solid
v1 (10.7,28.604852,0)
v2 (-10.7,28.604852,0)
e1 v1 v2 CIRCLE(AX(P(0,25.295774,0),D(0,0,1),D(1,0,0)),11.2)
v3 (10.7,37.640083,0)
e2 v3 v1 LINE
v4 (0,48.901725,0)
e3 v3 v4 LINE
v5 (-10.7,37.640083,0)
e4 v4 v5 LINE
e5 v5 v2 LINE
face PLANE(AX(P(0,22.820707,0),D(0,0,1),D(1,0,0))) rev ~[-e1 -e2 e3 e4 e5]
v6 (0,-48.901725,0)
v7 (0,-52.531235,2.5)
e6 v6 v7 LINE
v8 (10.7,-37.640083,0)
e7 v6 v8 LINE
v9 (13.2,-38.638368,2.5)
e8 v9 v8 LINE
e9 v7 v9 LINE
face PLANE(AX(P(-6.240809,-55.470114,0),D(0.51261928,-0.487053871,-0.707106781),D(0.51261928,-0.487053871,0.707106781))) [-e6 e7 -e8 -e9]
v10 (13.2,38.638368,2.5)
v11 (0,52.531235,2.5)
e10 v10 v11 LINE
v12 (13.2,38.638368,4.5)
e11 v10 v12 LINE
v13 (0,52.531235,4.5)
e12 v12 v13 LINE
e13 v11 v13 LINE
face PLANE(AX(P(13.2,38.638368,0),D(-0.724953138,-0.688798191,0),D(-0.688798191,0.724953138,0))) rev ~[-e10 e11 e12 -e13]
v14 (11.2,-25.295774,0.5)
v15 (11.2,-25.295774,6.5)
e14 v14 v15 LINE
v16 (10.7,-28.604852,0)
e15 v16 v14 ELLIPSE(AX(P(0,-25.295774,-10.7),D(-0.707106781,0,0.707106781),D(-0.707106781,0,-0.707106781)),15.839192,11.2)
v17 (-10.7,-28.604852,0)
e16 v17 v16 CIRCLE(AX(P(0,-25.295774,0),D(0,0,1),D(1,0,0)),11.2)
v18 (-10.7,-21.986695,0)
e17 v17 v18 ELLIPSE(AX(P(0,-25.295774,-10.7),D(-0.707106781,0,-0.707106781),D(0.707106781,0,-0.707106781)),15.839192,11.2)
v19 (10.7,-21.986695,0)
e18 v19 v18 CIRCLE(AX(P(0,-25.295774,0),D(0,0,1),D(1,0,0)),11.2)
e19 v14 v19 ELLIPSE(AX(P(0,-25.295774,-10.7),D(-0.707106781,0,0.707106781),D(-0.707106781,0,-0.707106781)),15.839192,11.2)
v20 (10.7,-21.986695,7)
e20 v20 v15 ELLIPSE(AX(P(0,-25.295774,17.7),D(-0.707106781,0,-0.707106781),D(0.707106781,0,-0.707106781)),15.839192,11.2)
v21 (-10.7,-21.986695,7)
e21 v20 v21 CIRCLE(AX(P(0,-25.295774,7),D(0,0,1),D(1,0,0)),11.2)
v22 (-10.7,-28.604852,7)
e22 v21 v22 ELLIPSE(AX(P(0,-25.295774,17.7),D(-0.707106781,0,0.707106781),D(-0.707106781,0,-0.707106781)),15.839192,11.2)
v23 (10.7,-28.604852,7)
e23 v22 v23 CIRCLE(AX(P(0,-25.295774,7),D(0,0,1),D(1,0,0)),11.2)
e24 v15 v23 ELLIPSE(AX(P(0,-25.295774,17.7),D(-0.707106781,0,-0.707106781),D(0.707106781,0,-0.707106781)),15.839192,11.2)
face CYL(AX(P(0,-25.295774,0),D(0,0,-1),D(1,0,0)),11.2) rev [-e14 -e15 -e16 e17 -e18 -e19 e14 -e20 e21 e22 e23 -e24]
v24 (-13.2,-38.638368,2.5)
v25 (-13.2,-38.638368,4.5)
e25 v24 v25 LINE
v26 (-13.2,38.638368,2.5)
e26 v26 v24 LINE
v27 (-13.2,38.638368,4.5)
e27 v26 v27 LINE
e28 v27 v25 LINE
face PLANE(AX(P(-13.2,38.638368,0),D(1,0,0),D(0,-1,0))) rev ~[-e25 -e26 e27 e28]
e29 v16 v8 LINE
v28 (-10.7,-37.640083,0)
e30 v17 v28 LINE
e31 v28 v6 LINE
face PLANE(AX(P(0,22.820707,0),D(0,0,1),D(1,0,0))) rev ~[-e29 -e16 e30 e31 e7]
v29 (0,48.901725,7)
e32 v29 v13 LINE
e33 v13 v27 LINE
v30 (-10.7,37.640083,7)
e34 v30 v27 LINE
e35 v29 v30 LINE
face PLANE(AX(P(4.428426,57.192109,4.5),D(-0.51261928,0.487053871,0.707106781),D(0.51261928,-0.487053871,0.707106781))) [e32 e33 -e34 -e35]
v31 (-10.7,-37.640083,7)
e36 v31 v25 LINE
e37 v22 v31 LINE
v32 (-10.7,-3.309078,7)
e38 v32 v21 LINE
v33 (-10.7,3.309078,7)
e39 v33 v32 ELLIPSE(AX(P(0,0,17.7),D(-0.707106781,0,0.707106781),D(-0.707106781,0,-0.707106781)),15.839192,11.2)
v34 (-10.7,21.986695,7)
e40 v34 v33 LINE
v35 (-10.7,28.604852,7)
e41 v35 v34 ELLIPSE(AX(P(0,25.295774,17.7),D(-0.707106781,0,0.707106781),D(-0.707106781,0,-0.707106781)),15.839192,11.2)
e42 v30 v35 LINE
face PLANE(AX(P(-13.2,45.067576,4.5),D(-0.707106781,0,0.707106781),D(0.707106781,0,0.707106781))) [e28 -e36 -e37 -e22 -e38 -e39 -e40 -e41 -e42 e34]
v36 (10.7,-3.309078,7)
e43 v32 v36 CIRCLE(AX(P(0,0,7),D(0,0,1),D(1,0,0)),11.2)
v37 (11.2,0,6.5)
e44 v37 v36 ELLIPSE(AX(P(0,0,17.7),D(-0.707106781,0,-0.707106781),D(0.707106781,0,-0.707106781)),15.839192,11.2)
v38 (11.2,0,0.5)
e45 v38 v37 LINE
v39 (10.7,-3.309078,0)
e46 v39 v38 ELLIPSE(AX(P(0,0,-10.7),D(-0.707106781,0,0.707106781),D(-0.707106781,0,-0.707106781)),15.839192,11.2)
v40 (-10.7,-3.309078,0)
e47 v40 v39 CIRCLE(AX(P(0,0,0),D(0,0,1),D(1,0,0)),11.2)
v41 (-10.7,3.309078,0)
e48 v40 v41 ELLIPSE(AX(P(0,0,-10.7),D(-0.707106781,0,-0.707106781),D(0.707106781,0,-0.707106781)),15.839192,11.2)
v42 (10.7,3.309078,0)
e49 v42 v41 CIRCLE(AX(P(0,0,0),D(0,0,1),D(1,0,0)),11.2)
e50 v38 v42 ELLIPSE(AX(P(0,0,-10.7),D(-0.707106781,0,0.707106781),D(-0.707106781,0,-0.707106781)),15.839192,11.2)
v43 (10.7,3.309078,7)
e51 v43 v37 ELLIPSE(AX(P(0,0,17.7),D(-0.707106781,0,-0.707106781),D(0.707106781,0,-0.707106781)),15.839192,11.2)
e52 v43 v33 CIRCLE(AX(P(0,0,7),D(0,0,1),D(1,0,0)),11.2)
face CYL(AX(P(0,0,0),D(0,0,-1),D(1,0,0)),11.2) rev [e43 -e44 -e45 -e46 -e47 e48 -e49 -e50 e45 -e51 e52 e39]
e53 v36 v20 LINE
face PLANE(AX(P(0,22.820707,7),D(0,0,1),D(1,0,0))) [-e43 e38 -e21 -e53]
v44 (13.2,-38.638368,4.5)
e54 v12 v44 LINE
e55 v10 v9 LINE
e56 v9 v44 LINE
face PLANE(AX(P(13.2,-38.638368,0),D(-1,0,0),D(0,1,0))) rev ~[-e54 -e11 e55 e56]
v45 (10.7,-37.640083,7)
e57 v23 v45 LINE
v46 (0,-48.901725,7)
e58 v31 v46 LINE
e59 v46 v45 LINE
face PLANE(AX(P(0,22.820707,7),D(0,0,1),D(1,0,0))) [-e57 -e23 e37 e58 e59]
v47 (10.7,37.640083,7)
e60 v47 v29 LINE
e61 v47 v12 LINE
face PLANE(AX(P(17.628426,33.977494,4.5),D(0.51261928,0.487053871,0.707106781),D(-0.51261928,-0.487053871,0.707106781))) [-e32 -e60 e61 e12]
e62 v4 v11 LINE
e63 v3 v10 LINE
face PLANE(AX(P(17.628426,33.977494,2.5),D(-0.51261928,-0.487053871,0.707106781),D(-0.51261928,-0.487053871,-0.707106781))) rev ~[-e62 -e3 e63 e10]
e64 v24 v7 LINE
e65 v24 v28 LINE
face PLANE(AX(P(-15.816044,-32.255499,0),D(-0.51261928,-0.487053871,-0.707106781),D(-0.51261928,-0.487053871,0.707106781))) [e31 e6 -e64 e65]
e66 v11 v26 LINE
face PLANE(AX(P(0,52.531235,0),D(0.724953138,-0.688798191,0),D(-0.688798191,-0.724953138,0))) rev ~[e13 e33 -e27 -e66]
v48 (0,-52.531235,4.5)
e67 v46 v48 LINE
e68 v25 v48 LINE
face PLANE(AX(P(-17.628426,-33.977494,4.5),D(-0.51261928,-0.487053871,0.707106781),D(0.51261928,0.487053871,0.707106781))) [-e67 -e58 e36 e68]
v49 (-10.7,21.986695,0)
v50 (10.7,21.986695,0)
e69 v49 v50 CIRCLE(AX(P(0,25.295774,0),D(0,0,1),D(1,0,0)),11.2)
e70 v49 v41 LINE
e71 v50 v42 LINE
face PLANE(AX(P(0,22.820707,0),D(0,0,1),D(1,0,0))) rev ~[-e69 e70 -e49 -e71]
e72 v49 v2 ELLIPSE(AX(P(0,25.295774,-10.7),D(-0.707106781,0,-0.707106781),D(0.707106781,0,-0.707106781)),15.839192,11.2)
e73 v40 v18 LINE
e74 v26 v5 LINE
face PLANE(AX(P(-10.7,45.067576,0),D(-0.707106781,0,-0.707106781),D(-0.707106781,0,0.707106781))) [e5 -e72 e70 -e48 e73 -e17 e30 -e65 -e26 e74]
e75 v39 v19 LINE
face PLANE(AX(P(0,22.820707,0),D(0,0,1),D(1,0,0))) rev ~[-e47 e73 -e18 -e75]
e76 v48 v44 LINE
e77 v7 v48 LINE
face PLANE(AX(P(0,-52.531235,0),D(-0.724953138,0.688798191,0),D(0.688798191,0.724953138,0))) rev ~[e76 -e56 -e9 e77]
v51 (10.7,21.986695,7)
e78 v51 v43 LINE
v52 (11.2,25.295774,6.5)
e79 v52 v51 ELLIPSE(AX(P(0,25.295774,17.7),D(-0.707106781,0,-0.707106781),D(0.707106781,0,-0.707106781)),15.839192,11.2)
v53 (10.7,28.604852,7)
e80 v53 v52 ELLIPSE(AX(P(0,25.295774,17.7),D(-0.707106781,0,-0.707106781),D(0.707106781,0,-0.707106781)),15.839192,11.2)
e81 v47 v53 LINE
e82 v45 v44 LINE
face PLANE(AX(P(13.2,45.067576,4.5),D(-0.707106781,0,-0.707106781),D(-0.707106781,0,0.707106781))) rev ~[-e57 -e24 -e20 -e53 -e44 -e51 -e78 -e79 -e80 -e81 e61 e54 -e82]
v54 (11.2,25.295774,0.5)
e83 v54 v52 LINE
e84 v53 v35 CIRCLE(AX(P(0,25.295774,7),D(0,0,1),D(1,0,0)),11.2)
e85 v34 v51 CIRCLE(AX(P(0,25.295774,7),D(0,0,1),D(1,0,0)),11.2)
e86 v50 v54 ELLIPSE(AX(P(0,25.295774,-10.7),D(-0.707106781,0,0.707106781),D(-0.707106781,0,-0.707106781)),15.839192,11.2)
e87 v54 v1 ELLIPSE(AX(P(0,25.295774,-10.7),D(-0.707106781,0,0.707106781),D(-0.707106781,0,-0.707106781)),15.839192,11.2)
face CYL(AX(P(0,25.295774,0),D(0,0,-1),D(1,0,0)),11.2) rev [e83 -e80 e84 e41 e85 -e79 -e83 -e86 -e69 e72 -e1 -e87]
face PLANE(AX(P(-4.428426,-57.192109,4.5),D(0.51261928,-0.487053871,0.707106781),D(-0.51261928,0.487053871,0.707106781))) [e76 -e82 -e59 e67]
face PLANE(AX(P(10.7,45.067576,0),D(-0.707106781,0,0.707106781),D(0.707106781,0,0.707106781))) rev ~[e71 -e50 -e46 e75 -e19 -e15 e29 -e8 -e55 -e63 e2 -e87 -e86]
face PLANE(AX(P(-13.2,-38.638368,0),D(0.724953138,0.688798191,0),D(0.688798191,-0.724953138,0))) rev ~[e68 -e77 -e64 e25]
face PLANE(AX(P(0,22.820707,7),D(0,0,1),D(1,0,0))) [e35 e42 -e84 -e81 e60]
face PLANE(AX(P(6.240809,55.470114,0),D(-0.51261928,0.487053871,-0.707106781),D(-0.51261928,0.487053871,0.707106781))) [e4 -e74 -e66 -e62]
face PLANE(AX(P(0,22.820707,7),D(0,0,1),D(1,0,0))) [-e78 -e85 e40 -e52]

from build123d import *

# Parameters (mm, degrees)
F0_R        = 11.2
F1_DEPTH    = 7
F2_T1_DEPTH = 32.0222283479
F2_T3_DEPTH = 32.0222283479
F2_T5_DEPTH = 90.1351514377
F2_T7_DEPTH = 32.0222283479
F2_T9_DEPTH = 32.0222283479
F3_T1_DEPTH = 32.0222283479
F3_T3_DEPTH = 32.0222283479
F3_T5_DEPTH = 90.1351514377
F3_T7_DEPTH = 32.0222283479
F3_T9_DEPTH = 32.0222283479


# Not quite as in the source:
# - a fillet or chamfer that OpenCascade refuses, or shapes differently, is made with other operations: its cross-section is extruded or revolved along the edge and cut away or added


with BuildPart() as f1:
    # F0 (on Top) → F1 (new body)
    with BuildSketch(Plane.XY):
        with BuildLine():
            ThreePointArc((-13.2, 0), (0, 13.2), (13.2, 0))
            Line((13.2, 0), (13.2, 38.6383682489))
            Line((13.2, 38.6383682489), (0, 52.53123492))
            Line((0, 52.53123492), (-13.2, 38.6383682489))
            Line((-13.2, 38.6383682489), (-13.2, 0))
        make_face()
        with Locations((0, 25.2957735211)):
            Circle(F0_R, mode=Mode.SUBTRACT)
        with BuildLine():
            Line((13.2, -38.6383682489), (13.2, 0))
            ThreePointArc((13.2, 0), (0, -13.2), (-13.2, 0))
            Line((-13.2, 0), (-13.2, -38.6383682489))
            Line((-13.2, -38.6383682489), (0, -52.53123492))
            Line((0, -52.53123492), (13.2, -38.6383682489))
        make_face()
        with Locations((0, -25.2957735211)):
            Circle(F0_R, mode=Mode.SUBTRACT)
        with BuildLine():
            ThreePointArc((-13.2, 0), (0, -13.2), (13.2, 0))
            ThreePointArc((13.2, 0), (0, 13.2), (-13.2, 0))
        make_face()
        Circle(F0_R, mode=Mode.SUBTRACT)
    extrude(amount=F1_DEPTH)

    # F2: chamfer of 2.5 on 6 edges, made by hand

    # F2_s2 → F2_t1 (cut)
    with BuildSketch(Plane(origin=(-30.6597100359, -32.269035129, 0), x_dir=(0, 0, 1), z_dir=(0.6887981906, 0.7249531383, 0))):
        Polygon((4.5, 36.1834195615), (7, 33.6834195615), (7, 36.1834195615), align=None)
    extrude(amount=F2_T1_DEPTH, mode=Mode.SUBTRACT)

    # F2_s4 → F2_t3 (cut)
    with BuildSketch(Plane(origin=(8.6028570917, -9.0544201944, 0), x_dir=(0, 0, 1), z_dir=(0.6887981906, -0.7249531383, 0))):
        Polygon((4.5, 36.1834195615), (7, 33.6834195615), (7, 36.1834195615), align=None)
    extrude(amount=F2_T3_DEPTH, mode=Mode.SUBTRACT)

    # F2_s6 → F2_t5 (cut)
    with BuildSketch(Plane.XZ.offset(-45.0675757189)):
        Polygon((13.2, 4.5), (10.7, 7), (13.2, 7), align=None)
        Polygon((-13.2, 4.5), (-10.7, 7), (-13.2, 7), align=None)
    extrude(amount=F2_T5_DEPTH, mode=Mode.SUBTRACT)

    # F2_s8 → F2_t7 (cut)
    with BuildSketch(Plane(origin=(30.6597100359, 32.269035129, 0), x_dir=(0, 0, 1), z_dir=(-0.6887981906, -0.7249531383, 0))):
        Polygon((4.5, 36.1834195615), (7, 33.6834195615), (7, 36.1834195615), align=None)
    extrude(amount=F2_T7_DEPTH, mode=Mode.SUBTRACT)

    # F2_s10 → F2_t9 (cut)
    with BuildSketch(Plane(origin=(-8.6028570917, 9.0544201944, 0), x_dir=(0, 0, 1), z_dir=(-0.6887981906, 0.7249531383, 0))):
        Polygon((4.5, 36.1834195615), (7, 33.6834195615), (7, 36.1834195615), align=None)
    extrude(amount=F2_T9_DEPTH, mode=Mode.SUBTRACT)

    # F3: chamfer of 2.5 on 6 edges, made by hand

    # F3_s2 → F3_t1 (cut)
    with BuildSketch(Plane(origin=(8.6028570917, -9.0544201944, 0), x_dir=(0, 0, 1), z_dir=(0.6887981906, -0.7249531383, 0))):
        Polygon((0, 33.6834195615), (2.5, 36.1834195615), (0, 36.1834195615), align=None)
    extrude(amount=F3_T1_DEPTH, mode=Mode.SUBTRACT)

    # F3_s4 → F3_t3 (cut)
    with BuildSketch(Plane(origin=(-30.6597100359, -32.269035129, 0), x_dir=(0, 0, 1), z_dir=(0.6887981906, 0.7249531383, 0))):
        Polygon((0, 33.6834195615), (2.5, 36.1834195615), (0, 36.1834195615), align=None)
    extrude(amount=F3_T3_DEPTH, mode=Mode.SUBTRACT)

    # F3_s6 → F3_t5 (cut)
    with BuildSketch(Plane.XZ.offset(-45.0675757189)):
        Polygon((10.7, 0), (13.2, 2.5), (13.2, 0), align=None)
        Polygon((-10.7, 0), (-13.2, 2.5), (-13.2, 0), align=None)
    extrude(amount=F3_T5_DEPTH, mode=Mode.SUBTRACT)

    # F3_s8 → F3_t7 (cut)
    with BuildSketch(Plane(origin=(30.6597100359, 32.269035129, 0), x_dir=(0, 0, 1), z_dir=(-0.6887981906, -0.7249531383, 0))):
        Polygon((0, 33.6834195615), (2.5, 36.1834195615), (0, 36.1834195615), align=None)
    extrude(amount=F3_T7_DEPTH, mode=Mode.SUBTRACT)

    # F3_s10 → F3_t9 (cut)
    with BuildSketch(Plane(origin=(-8.6028570917, 9.0544201944, 0), x_dir=(0, 0, 1), z_dir=(-0.6887981906, 0.7249531383, 0))):
        Polygon((2.5, 36.1834195615), (0, 33.6834195615), (0, 36.1834195615), align=None)
    extrude(amount=F3_T9_DEPTH, mode=Mode.SUBTRACT)


solid = f1.part
